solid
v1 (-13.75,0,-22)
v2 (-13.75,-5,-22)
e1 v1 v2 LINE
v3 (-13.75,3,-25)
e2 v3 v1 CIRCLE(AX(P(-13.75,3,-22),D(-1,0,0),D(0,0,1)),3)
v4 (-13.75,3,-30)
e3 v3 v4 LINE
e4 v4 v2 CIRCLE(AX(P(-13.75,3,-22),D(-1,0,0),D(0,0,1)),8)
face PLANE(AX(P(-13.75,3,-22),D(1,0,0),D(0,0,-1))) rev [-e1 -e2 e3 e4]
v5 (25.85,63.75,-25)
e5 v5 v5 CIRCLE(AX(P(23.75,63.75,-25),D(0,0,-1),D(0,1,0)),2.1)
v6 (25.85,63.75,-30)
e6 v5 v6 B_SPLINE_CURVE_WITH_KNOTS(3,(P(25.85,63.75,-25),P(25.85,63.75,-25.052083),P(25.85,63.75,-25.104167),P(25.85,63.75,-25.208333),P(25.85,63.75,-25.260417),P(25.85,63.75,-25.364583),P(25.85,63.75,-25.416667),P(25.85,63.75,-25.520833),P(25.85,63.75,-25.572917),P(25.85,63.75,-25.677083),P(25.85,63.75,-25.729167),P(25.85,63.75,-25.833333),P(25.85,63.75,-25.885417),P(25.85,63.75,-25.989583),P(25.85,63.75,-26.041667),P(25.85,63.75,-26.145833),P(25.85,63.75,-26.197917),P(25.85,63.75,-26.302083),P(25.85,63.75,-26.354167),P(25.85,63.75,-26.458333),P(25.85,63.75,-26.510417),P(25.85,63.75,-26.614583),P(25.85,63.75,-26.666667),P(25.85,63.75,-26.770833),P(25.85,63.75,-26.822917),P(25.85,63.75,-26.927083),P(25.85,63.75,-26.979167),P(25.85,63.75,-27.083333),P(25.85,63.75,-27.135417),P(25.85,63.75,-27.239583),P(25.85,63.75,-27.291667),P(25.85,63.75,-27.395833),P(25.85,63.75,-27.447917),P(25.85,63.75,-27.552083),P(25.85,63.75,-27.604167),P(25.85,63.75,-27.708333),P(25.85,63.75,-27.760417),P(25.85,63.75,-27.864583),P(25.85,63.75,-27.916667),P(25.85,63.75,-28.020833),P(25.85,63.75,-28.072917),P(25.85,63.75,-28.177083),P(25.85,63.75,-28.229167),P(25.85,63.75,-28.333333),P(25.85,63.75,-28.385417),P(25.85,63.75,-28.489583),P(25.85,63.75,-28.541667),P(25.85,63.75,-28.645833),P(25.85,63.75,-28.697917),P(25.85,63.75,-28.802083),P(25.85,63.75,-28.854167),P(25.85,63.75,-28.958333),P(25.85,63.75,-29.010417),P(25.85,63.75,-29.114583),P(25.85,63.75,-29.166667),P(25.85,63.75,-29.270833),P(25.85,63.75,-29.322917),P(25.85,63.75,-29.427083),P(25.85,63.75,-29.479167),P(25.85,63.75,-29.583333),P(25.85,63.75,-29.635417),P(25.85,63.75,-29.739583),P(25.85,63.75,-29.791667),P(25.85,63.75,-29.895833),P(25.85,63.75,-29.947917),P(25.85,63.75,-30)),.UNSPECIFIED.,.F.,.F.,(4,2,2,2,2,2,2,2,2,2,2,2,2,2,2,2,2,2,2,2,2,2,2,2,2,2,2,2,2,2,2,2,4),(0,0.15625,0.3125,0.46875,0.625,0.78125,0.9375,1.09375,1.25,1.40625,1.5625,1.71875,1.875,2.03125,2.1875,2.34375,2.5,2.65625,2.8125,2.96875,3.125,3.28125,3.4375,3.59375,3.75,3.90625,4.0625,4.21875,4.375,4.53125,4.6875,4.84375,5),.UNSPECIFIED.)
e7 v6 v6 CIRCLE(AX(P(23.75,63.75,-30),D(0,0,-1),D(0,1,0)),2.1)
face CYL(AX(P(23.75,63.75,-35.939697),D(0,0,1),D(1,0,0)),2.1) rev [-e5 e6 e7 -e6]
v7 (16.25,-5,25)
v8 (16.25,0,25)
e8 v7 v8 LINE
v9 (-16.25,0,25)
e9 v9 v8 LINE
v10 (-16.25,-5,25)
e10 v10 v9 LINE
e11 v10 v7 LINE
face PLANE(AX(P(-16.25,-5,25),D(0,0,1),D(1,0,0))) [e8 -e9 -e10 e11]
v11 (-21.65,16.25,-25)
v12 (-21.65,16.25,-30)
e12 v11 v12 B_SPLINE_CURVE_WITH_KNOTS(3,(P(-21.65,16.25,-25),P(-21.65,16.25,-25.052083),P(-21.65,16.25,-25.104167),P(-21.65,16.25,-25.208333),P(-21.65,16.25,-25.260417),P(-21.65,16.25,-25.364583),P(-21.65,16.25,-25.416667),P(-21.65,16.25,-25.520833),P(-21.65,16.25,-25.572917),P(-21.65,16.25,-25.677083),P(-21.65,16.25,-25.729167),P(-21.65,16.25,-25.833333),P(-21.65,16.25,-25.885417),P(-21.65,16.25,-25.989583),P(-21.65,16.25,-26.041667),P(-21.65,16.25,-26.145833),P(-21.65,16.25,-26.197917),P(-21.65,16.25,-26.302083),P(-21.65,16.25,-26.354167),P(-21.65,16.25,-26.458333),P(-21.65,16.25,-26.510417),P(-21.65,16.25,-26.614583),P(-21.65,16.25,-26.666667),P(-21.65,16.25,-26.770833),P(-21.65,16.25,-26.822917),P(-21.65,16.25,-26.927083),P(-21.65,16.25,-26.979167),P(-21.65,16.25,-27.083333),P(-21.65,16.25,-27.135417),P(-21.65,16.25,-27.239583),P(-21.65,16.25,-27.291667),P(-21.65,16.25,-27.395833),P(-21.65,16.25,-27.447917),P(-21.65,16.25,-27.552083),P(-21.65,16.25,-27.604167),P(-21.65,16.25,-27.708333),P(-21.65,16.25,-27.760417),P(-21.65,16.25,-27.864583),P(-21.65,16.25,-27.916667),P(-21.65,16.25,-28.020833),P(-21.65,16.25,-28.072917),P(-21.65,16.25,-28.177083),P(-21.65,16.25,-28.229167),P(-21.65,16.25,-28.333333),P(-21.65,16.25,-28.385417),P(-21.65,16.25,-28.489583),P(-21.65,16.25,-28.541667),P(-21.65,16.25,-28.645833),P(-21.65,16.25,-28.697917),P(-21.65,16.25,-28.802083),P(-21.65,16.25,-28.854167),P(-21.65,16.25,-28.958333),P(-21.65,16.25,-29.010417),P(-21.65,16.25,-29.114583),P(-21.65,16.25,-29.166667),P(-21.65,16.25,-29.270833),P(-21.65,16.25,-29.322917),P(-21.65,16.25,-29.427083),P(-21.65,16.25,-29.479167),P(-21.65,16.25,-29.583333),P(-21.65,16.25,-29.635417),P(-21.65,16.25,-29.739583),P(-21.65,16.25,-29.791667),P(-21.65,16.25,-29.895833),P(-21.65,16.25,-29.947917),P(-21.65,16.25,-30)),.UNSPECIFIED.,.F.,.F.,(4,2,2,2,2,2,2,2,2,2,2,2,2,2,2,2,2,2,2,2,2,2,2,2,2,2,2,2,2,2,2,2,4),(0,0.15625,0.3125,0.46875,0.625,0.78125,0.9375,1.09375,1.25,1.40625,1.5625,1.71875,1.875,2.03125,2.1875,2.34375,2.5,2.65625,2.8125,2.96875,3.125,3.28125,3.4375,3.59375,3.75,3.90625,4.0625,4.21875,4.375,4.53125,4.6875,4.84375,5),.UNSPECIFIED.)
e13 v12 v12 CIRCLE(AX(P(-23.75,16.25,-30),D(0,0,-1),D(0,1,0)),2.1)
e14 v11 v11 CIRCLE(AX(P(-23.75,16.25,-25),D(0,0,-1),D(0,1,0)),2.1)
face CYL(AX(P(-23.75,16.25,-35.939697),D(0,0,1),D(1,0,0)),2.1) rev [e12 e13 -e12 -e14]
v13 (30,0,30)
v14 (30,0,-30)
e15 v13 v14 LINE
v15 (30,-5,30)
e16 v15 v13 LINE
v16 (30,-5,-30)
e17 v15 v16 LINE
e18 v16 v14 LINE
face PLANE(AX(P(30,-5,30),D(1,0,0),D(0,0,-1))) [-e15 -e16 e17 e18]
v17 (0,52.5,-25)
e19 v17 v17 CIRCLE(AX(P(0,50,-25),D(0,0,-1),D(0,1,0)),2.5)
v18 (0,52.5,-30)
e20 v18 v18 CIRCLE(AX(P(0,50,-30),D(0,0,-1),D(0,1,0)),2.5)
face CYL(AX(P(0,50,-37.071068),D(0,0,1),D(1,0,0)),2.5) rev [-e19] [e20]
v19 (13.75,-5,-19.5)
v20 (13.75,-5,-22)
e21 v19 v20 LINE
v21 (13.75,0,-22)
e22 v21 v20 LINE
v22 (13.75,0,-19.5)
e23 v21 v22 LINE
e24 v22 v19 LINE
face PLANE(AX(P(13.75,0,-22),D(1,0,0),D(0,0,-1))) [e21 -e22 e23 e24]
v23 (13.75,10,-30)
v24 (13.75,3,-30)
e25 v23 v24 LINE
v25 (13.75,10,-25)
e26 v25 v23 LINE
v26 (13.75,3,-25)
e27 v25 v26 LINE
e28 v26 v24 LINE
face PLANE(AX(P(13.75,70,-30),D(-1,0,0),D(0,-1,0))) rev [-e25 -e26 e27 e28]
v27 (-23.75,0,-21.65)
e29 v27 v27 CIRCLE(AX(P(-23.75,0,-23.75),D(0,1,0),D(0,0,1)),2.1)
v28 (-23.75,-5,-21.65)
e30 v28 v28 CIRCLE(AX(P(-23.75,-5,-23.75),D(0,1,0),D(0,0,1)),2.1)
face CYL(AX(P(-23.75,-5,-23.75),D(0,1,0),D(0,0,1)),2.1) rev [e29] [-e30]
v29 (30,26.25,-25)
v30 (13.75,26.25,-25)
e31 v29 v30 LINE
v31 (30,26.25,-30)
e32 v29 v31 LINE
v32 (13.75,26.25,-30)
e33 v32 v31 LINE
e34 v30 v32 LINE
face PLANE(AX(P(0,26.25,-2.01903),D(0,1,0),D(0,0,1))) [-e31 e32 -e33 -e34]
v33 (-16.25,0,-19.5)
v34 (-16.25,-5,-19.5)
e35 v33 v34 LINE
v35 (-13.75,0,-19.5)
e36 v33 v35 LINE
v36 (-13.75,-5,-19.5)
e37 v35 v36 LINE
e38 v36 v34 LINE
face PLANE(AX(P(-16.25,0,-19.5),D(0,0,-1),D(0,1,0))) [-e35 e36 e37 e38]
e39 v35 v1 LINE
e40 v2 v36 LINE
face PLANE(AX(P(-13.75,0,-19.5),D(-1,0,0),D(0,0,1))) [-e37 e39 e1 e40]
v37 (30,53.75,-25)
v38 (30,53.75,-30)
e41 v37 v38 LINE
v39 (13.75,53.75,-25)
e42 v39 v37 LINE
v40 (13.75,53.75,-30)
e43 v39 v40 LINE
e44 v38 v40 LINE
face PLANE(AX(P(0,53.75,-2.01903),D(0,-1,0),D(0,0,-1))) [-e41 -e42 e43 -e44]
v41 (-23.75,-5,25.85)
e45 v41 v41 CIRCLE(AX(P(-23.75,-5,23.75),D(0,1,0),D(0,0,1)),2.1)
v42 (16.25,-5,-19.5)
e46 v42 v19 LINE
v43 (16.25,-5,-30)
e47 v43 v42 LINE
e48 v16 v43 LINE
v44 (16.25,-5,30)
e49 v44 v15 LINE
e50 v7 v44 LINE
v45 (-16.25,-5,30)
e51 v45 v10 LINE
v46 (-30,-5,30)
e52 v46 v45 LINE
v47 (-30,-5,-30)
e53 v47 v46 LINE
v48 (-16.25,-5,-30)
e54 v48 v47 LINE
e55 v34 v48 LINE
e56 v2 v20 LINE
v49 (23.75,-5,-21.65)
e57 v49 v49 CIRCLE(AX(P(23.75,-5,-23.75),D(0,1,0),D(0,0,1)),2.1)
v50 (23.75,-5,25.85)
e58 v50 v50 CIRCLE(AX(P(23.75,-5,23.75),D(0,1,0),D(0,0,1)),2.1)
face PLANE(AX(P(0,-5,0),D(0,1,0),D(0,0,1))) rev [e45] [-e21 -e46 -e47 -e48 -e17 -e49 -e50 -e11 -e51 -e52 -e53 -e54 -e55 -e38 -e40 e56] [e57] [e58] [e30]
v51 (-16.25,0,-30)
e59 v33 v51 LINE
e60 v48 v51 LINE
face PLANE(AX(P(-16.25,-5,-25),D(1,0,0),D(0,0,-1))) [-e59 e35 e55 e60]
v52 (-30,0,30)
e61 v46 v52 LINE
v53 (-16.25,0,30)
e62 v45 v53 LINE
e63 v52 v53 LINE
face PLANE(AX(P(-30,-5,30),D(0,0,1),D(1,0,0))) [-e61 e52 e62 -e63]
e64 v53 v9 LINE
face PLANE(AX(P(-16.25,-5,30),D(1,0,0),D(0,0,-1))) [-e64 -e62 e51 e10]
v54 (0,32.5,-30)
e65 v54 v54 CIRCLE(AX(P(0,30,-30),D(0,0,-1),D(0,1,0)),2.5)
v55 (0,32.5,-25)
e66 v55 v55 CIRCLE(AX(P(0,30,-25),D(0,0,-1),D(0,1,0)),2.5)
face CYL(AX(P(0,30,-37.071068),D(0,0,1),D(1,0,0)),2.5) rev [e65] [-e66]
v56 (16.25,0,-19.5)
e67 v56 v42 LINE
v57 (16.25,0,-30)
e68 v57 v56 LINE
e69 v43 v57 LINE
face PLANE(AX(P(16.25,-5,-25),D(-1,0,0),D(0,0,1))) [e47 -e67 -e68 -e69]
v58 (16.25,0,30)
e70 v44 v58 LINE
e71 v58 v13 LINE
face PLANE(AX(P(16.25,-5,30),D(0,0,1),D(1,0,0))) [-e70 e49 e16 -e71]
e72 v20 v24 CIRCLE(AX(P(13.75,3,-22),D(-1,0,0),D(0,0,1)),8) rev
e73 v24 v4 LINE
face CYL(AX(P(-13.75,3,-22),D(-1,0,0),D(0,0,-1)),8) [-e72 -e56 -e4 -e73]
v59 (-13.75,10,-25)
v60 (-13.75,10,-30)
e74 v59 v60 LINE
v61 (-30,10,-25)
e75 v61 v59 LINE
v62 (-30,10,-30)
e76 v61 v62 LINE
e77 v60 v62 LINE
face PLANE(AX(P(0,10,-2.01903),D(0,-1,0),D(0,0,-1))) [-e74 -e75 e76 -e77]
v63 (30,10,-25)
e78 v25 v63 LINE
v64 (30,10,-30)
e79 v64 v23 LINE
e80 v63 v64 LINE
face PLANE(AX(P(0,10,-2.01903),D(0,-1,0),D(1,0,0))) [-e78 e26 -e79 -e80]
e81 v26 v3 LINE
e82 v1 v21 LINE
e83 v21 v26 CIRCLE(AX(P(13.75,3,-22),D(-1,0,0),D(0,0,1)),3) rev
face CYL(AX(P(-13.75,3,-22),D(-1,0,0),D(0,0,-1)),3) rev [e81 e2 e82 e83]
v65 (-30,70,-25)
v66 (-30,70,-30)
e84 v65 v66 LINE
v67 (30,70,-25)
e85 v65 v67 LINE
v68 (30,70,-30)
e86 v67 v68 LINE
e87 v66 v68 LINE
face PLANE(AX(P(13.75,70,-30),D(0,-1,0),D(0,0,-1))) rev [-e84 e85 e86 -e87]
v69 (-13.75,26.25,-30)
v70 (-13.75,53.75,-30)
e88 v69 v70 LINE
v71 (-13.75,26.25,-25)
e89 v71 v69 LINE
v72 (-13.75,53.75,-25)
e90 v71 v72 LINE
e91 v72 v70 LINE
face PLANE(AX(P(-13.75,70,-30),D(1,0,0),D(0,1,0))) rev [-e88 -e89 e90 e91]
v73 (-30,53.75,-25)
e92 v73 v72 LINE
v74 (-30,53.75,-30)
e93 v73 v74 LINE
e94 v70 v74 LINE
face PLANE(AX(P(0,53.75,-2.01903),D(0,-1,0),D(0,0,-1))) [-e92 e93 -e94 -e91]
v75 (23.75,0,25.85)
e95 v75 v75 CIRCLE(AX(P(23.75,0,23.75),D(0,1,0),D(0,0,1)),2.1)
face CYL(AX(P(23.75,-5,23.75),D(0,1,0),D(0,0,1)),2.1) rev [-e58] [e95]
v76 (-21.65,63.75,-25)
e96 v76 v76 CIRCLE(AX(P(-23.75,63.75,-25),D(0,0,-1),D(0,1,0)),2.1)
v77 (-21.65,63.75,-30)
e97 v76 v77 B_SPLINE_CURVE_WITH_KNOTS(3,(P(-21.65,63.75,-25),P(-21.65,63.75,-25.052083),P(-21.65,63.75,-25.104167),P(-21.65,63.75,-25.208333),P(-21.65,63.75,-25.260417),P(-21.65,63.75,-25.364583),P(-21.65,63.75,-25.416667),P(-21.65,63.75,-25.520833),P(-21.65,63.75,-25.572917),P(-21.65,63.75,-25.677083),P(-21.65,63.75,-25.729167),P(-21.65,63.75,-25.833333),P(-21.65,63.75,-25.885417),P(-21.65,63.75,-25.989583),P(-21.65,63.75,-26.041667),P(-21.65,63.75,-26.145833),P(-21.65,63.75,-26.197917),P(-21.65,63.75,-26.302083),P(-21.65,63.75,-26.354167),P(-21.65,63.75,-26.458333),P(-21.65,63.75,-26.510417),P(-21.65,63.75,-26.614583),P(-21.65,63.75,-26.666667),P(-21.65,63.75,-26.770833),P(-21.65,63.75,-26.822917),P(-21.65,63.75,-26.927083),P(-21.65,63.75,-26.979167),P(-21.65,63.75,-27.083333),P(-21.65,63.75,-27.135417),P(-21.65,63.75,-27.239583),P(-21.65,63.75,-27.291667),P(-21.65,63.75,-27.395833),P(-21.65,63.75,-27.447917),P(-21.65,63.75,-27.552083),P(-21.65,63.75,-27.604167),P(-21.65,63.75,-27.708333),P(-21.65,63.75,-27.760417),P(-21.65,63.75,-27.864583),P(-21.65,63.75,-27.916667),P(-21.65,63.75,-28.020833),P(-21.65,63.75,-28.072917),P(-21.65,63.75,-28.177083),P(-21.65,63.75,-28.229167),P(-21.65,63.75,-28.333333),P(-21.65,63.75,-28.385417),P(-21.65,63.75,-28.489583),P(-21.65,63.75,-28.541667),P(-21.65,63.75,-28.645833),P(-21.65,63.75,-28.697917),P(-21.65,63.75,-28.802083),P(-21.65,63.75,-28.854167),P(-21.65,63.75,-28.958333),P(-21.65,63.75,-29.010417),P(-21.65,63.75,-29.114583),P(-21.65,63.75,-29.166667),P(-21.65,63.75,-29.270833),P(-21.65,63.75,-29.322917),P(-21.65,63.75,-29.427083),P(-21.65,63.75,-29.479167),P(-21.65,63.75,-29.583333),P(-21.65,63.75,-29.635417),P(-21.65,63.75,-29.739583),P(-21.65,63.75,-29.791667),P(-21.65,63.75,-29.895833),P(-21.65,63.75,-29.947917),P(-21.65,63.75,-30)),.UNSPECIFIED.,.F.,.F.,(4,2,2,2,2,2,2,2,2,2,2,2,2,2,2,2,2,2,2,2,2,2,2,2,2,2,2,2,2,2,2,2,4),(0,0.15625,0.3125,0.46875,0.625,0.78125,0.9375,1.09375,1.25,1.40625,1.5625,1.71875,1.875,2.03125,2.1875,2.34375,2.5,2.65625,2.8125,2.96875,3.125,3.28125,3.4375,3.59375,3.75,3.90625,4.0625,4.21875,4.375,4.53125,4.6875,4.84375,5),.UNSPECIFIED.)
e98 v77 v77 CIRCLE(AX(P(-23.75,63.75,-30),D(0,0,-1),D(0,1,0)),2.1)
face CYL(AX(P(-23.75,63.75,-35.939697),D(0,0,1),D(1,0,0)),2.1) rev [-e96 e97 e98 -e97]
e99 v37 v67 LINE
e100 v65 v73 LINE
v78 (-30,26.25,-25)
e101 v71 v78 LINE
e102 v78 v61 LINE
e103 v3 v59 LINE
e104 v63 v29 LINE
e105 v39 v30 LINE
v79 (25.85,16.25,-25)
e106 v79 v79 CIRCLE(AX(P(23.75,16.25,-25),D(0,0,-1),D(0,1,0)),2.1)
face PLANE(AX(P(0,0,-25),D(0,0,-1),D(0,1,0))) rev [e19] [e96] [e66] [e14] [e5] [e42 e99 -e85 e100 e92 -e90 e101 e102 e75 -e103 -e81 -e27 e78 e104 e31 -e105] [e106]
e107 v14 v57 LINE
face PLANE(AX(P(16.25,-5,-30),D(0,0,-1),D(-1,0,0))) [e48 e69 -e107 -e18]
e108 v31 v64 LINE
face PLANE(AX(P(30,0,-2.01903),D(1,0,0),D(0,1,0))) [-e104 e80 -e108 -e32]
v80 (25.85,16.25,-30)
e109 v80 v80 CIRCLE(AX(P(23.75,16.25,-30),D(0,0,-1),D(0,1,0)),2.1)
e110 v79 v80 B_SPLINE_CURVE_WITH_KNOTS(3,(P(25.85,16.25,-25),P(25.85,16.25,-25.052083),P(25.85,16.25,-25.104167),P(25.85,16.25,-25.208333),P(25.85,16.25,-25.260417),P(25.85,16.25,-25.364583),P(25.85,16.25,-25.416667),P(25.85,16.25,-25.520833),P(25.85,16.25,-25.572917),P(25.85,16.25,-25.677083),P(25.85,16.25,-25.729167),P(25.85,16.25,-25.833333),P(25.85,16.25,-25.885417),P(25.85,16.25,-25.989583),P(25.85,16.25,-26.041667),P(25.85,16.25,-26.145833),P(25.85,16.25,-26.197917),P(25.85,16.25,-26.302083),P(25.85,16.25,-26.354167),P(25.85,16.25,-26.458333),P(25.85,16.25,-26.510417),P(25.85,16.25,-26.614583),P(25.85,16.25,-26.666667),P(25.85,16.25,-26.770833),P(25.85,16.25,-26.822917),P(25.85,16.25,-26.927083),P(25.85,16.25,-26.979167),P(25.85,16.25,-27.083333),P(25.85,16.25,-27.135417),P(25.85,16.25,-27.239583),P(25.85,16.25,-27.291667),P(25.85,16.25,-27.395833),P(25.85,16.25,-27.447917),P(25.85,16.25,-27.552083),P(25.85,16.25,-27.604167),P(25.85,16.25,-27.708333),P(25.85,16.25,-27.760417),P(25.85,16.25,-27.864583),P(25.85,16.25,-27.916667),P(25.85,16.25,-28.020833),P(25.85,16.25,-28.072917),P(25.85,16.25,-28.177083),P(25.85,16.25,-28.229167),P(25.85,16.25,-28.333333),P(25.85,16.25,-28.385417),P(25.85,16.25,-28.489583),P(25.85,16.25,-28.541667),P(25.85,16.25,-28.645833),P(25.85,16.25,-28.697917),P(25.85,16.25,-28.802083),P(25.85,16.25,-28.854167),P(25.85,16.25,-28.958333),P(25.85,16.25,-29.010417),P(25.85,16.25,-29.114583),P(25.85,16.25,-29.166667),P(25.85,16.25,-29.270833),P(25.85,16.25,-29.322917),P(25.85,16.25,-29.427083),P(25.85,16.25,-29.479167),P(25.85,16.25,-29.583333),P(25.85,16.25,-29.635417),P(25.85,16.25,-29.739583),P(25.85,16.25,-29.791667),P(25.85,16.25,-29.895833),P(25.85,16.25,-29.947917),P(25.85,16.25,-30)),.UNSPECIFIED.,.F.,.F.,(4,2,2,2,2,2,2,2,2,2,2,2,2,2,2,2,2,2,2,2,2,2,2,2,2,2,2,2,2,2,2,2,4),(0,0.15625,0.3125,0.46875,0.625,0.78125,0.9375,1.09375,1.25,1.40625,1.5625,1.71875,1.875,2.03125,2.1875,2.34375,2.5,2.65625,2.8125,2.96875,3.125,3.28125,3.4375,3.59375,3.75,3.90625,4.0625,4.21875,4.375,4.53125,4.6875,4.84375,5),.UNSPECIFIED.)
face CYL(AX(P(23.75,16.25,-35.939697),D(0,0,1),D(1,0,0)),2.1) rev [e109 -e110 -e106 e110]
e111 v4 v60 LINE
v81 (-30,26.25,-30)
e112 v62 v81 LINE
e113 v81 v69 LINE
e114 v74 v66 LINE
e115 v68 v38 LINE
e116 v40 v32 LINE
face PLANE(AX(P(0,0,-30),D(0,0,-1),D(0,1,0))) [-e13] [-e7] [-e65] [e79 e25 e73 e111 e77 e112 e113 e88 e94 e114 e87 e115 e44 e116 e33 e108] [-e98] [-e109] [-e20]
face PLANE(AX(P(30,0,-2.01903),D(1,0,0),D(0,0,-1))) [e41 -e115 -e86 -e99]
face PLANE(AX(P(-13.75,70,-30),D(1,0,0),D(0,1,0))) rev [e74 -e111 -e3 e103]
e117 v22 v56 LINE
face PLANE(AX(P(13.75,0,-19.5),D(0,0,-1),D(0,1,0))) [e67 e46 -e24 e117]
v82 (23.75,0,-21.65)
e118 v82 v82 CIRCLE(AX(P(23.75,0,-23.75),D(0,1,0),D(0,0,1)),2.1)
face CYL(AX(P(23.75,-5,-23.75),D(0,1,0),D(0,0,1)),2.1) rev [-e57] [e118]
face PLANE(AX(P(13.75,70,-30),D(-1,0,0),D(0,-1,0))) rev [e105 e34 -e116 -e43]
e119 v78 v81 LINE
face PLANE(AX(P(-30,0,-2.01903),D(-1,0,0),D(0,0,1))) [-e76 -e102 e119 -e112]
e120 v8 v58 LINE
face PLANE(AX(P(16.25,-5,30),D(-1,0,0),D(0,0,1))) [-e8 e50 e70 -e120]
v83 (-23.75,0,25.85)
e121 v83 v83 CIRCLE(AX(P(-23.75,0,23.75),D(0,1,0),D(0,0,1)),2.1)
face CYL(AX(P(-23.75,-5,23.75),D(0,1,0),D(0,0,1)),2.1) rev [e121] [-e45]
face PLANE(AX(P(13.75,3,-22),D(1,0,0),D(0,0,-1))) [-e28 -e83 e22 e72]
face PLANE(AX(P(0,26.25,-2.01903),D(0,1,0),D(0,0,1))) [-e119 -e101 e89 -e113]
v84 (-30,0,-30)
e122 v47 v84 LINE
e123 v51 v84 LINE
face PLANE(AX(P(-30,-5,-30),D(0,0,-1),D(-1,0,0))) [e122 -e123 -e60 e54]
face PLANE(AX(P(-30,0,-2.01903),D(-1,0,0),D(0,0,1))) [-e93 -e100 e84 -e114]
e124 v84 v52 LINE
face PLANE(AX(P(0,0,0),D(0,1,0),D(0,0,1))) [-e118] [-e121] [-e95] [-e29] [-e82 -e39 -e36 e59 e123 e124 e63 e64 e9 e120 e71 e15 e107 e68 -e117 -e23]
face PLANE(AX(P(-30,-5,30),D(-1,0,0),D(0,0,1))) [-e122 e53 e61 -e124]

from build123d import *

# Parameters (mm, degrees)
SKETCH_1_R                        = 2.1
SM_BASE_FLANGE_1_DEPTH            = 5
SM_EDGE_FLANGE_1_STRIP_W          = 26
SM_EDGE_FLANGE_1_STRIP_H          = 5
SM_EDGE_FLANGE_1_STRIP_CUT_DEPTH  = 27.5
SM_EDGE_FLANGE_1_RELIEF_W         = 28.5
SM_EDGE_FLANGE_1_RELIEF_H         = 2.5
SM_EDGE_FLANGE_1_RELIEF_CUT_DEPTH = 5
SM_EDGE_FLANGE_1_DEPTH            = 27.5
EXTRUDE_START                     = -30
SKETCH_9_W                        = 16.25
SKETCH_9_H                        = 16.25
EXTRUDE_1_DEPTH                   = 5
CUT_EXTRUDE_START                 = -30
SKETCH_10_R                       = 2.5
CUT_EXTRUDE_1_DEPTH               = 5
SKETCH_11_R                       = 2.1
CUT_EXTRUDE_2_DEPTH               = 5


# Sheet-metal steps are written as plain solids
with BuildPart() as part:
    # Sketch 1 → 基体-法兰1 (new body)
    with BuildSketch(Plane(origin=(0, 0, 0), x_dir=(1, 0, 0), z_dir=(0, 1, 0))):
        Polygon((-16.25, 25), (-16.25, 30), (-30, 30), (-30, -30), (-16.25, -30), (-16.25, -25), (16.25, -25), (16.25, -30), (30, -30), (30, 30), (16.25, 30), (16.25, 25), align=None)
        with Locations(Location((-23.75, 23.75, 0), (0, 0, 270))):
            Circle(SKETCH_1_R, mode=Mode.SUBTRACT)
        with Locations(Location((23.75, 23.75, 0), (0, 0, 270))):
            Circle(SKETCH_1_R, mode=Mode.SUBTRACT)
        with Locations(Location((-23.75, -23.75, 0), (0, 0, 270))):
            Circle(SKETCH_1_R, mode=Mode.SUBTRACT)
        with Locations(Location((23.75, -23.75, 0), (0, 0, 270))):
            Circle(SKETCH_1_R, mode=Mode.SUBTRACT)
    extrude(amount=-SM_BASE_FLANGE_1_DEPTH)

    # 边线-法兰1 strip (across the edge) → 边线-法兰1 strip cut (cut)
    with BuildSketch(Plane(origin=(13.75, 0, -25), x_dir=(0, 0, 1), z_dir=(-1, 0, 0))):
        with Locations((-10, -2.5)):
            Rectangle(SM_EDGE_FLANGE_1_STRIP_W, SM_EDGE_FLANGE_1_STRIP_H)
    extrude(amount=SM_EDGE_FLANGE_1_STRIP_CUT_DEPTH, mode=Mode.SUBTRACT)

    # 边线-法兰1 relief (on the sheet) → 边线-法兰1 relief cut (cut)
    with BuildSketch(Plane(origin=(13.75, 0, -22), x_dir=(0, 0, 1), z_dir=(0, 1, 0))):
        with Locations((-11.75, 1.25)):
            Rectangle(SM_EDGE_FLANGE_1_RELIEF_W, SM_EDGE_FLANGE_1_RELIEF_H)
        with Locations((-11.75, -28.75)):
            Rectangle(SM_EDGE_FLANGE_1_RELIEF_W, SM_EDGE_FLANGE_1_RELIEF_H)
    extrude(amount=-SM_EDGE_FLANGE_1_RELIEF_CUT_DEPTH, mode=Mode.SUBTRACT)

    # 边线-法兰1 section (across the edge) → 边线-法兰1 (add)
    with BuildSketch(Plane(origin=(13.75, 0, -25), x_dir=(0, 0, 1), z_dir=(-1, 0, 0))):
        with BuildLine():
            Line((-5, 3), (-5, 70))
            Line((-5, 70), (0, 70))
            Line((0, 70), (0, 3))
            ThreePointArc((0, 3), (0.878679656, 0.878679656), (3, 0))
            Line((3, 0), (3, -5))
            ThreePointArc((3, -5), (-2.656854249, -2.656854249), (-5, 3))
        make_face()
    extrude(amount=SM_EDGE_FLANGE_1_DEPTH)

    # 草图9 → 凸台-拉伸1 (add)
    with BuildSketch(Plane.XY.offset(EXTRUDE_START)):
        with Locations((-21.875, 61.875)):
            Rectangle(SKETCH_9_W, SKETCH_9_H)
        with Locations((21.875, 61.875)):
            Rectangle(SKETCH_9_W, SKETCH_9_H)
        with Locations((-21.875, 18.125)):
            Rectangle(SKETCH_9_W, SKETCH_9_H)
        with Locations((21.875, 18.125)):
            Rectangle(SKETCH_9_W, SKETCH_9_H)
    extrude(amount=EXTRUDE_1_DEPTH)

    # 草图10 → 切除-拉伸1 (cut)
    with BuildSketch(Plane.XY.offset(CUT_EXTRUDE_START)):
        with Locations(Location((0, 50, 0), (0, 0, 90))):
            Circle(SKETCH_10_R)
        with Locations(Location((0, 30, 0), (0, 0, 90))):
            Circle(SKETCH_10_R)
    extrude(amount=CUT_EXTRUDE_1_DEPTH, mode=Mode.SUBTRACT)

    # 草图11 → 切除-拉伸2 (cut)
    with BuildSketch(Plane.XY.offset(CUT_EXTRUDE_START)):
        with Locations((-23.75, 16.25)):
            Circle(SKETCH_11_R)
        with Locations((-23.75, 63.75)):
            Circle(SKETCH_11_R)
        with Locations((23.75, 63.75)):
            Circle(SKETCH_11_R)
        with Locations((23.75, 16.25)):
            Circle(SKETCH_11_R)
    extrude(amount=CUT_EXTRUDE_2_DEPTH, mode=Mode.SUBTRACT)


solid = part.part
